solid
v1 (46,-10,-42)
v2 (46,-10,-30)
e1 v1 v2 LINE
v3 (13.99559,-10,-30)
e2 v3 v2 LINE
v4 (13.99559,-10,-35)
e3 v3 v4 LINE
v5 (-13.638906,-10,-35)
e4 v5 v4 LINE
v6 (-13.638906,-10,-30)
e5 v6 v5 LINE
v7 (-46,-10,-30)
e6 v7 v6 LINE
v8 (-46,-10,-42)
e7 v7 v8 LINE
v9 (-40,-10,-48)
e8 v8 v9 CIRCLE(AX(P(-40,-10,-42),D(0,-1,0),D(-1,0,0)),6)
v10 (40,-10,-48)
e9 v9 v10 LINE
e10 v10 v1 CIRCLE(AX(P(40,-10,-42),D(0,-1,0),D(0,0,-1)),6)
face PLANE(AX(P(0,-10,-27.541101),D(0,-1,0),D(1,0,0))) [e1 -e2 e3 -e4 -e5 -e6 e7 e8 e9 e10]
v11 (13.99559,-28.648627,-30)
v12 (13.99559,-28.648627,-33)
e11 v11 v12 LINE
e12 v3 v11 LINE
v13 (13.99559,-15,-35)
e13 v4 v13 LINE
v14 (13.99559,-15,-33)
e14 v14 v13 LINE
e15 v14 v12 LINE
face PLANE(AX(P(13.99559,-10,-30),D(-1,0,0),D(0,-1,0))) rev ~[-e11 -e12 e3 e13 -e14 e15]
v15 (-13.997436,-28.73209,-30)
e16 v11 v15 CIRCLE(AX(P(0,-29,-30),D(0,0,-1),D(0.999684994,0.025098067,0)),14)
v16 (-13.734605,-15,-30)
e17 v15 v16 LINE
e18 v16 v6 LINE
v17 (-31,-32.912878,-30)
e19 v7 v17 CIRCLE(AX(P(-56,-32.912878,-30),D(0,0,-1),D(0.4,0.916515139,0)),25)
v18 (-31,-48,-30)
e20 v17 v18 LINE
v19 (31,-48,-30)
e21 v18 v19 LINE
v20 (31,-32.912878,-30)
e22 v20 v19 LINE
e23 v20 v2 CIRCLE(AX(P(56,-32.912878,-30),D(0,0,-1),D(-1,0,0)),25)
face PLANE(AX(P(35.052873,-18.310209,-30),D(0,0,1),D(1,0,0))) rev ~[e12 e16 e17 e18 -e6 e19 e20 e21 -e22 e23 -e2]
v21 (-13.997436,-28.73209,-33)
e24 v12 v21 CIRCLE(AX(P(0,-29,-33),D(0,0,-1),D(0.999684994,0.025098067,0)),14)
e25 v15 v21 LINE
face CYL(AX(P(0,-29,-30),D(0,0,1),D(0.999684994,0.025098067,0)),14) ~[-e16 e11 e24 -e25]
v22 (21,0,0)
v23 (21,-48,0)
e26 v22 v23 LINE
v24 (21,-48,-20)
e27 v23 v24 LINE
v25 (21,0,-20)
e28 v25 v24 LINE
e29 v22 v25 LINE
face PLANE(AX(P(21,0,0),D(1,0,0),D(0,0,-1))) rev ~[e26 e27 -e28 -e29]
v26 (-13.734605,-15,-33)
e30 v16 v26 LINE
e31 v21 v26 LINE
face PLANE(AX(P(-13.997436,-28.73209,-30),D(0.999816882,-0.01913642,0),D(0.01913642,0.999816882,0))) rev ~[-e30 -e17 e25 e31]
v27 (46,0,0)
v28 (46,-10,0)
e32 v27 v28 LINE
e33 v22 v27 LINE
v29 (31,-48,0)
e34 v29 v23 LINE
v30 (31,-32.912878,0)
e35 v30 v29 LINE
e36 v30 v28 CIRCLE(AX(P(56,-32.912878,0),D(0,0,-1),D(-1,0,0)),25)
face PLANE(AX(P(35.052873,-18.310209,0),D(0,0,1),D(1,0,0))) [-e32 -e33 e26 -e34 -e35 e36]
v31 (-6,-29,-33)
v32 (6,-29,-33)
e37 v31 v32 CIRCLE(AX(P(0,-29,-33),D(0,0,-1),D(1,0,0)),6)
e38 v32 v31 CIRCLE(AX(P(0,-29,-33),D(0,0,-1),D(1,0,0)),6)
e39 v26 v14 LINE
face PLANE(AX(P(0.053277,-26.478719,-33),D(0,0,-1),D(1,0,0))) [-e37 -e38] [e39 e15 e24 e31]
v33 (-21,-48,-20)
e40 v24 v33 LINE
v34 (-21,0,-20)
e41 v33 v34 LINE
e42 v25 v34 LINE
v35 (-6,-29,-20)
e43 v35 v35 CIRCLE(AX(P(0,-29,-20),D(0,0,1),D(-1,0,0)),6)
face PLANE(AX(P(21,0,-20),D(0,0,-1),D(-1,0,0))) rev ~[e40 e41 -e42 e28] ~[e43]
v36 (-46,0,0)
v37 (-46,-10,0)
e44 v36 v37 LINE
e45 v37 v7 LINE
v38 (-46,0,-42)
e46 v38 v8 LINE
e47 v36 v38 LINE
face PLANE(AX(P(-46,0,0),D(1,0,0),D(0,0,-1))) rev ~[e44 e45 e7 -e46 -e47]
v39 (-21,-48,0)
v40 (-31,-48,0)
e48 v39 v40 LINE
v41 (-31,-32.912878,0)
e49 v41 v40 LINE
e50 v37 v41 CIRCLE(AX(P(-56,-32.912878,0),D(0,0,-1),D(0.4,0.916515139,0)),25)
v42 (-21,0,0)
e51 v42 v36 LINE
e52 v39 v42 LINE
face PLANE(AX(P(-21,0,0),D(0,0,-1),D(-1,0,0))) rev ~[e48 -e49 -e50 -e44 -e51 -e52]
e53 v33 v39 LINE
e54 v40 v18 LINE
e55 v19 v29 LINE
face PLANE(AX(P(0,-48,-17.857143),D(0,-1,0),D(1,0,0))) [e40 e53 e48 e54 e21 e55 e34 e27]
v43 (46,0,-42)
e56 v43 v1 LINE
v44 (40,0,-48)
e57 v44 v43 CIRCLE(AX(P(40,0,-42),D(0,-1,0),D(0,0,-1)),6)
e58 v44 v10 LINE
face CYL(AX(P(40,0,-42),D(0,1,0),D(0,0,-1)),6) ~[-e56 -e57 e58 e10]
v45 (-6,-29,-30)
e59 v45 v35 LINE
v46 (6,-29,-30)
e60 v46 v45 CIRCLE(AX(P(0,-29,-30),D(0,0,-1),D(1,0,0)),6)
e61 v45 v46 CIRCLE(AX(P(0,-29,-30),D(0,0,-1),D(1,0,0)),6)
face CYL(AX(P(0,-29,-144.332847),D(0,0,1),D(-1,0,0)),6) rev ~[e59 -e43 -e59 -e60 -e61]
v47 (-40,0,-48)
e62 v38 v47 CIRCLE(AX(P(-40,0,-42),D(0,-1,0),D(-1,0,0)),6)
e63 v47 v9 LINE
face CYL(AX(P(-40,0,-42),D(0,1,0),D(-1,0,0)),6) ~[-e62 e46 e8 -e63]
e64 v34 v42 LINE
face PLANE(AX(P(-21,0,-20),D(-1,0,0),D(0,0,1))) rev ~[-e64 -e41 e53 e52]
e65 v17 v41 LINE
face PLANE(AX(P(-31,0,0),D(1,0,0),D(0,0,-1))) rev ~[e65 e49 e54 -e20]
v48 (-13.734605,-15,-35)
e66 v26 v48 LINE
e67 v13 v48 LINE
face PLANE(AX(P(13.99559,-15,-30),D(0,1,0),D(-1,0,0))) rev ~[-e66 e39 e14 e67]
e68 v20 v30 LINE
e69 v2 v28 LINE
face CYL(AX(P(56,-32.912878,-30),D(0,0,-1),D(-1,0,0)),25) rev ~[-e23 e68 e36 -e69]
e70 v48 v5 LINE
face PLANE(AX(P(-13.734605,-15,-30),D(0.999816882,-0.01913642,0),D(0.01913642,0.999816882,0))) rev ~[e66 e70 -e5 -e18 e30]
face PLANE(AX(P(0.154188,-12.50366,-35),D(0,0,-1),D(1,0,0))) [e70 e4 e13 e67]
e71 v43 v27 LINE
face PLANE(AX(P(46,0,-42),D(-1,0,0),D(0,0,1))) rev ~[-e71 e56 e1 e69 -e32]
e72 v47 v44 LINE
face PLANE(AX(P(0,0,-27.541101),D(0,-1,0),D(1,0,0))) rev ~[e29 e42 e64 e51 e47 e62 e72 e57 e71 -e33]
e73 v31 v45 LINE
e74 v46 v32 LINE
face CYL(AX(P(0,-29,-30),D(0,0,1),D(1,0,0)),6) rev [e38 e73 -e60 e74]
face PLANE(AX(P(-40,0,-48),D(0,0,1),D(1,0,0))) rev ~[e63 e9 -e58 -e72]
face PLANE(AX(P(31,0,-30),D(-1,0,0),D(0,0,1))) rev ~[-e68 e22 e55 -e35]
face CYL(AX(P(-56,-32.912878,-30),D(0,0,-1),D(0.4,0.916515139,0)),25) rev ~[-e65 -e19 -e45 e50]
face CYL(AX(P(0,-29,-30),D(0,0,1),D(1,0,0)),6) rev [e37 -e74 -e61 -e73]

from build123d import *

# Parameters (mm, degrees)
F1_DEPTH    = 48
F2_DEPTH    = 10
F3_R        = 6
F4_DEPTH    = 3
F5_DEPTH    = 5
F6_T1_DEPTH = 30
F7_D        = 12


# Not quite as in the source:
# - a fillet or chamfer that OpenCascade refuses, or shapes differently, is made with other operations: its cross-section is extruded or revolved along the edge and cut away or added


with BuildPart() as f1:
    # F0 (on Front) → F1 (new body)
    with BuildSketch(Plane.XZ):
        Polygon((-21, 0), (-31, 0), (-31, -30), (31, -30), (31, 0), (21, 0), (21, -20), (-21, -20), align=None)
    extrude(amount=F1_DEPTH)

    # F0 (on Front) → F2 (join)
    with BuildSketch(Plane.XZ):
        with BuildLine():
            Line((-31, 0), (-46, 0))
            Line((-46, 0), (-46, -42))
            ThreePointArc((-46, -42), (-44.2426406871, -46.2426406871), (-40, -48))
            Line((-40, -48), (40, -48))
            ThreePointArc((40, -48), (44.2426406871, -46.2426406871), (46, -42))
            Line((46, -42), (46, 0))
            Line((46, 0), (31, 0))
            Line((31, 0), (31, -30))
            Line((31, -30), (-31, -30))
            Line((-31, -30), (-31, 0))
        make_face()
        Polygon((-21, 0), (-31, 0), (-31, -30), (31, -30), (31, 0), (21, 0), (21, -20), (-21, -20), align=None)
    extrude(amount=F2_DEPTH)

    # F3 (on face) → F4 (join)
    with BuildSketch(Plane(origin=(0, 0, -30), x_dir=(1, 0, 0), z_dir=(0, 0, -1))):
        with BuildLine():
            Line((13.9955899146, 15), (13.9955899146, 28.6486270591))
            ThreePointArc((13.9955899146, 28.6486270591), (0.0417417441, 42.9999377722), (-13.9974363474, 28.7320901258))
            Line((-13.9974363474, 28.7320901258), (-13.7346051799, 15))
            Line((-13.7346051799, 15), (13.9955899146, 15))
        make_face()
        with Locations((0, 29)):
            Circle(F3_R, mode=Mode.SUBTRACT)
    extrude(amount=F4_DEPTH)

    # F3 (on face) → F5 (join)
    with BuildSketch(Plane(origin=(0, 0, -30), x_dir=(1, 0, 0), z_dir=(0, 0, -1))):
        Polygon((13.9955899146, 10), (13.9955899146, 15), (-13.7346051799, 15), (-13.6389055576, 10), align=None)
    extrude(amount=F5_DEPTH)

    # F6: fillet of radius 25 on 2 edges, made by hand

    # F6_s2 → F6_t1 (join)
    with BuildSketch(Plane.XY.offset(-30)):
        with BuildLine():
            ThreePointArc((31, -32.9128784748), (35.0834993366, -19.2198145372), (46, -10))
            Line((46, -10), (31, -10))
            Line((31, -10), (31, -32.9128784748))
        make_face()
        with BuildLine():
            ThreePointArc((-46, -10), (-35.0834993366, -19.2198145372), (-31, -32.9128784748))
            Line((-31, -32.9128784748), (-31, -10))
            Line((-31, -10), (-46, -10))
        make_face()
    extrude(amount=F6_T1_DEPTH)

    # F7 (through all)
    with Locations(Plane(origin=(0, 0, -30), x_dir=(1, 0, 0), z_dir=(0, 0, -1))):
        with Locations((0, 29)):
            Hole(F7_D / 2)


solid = f1.part
